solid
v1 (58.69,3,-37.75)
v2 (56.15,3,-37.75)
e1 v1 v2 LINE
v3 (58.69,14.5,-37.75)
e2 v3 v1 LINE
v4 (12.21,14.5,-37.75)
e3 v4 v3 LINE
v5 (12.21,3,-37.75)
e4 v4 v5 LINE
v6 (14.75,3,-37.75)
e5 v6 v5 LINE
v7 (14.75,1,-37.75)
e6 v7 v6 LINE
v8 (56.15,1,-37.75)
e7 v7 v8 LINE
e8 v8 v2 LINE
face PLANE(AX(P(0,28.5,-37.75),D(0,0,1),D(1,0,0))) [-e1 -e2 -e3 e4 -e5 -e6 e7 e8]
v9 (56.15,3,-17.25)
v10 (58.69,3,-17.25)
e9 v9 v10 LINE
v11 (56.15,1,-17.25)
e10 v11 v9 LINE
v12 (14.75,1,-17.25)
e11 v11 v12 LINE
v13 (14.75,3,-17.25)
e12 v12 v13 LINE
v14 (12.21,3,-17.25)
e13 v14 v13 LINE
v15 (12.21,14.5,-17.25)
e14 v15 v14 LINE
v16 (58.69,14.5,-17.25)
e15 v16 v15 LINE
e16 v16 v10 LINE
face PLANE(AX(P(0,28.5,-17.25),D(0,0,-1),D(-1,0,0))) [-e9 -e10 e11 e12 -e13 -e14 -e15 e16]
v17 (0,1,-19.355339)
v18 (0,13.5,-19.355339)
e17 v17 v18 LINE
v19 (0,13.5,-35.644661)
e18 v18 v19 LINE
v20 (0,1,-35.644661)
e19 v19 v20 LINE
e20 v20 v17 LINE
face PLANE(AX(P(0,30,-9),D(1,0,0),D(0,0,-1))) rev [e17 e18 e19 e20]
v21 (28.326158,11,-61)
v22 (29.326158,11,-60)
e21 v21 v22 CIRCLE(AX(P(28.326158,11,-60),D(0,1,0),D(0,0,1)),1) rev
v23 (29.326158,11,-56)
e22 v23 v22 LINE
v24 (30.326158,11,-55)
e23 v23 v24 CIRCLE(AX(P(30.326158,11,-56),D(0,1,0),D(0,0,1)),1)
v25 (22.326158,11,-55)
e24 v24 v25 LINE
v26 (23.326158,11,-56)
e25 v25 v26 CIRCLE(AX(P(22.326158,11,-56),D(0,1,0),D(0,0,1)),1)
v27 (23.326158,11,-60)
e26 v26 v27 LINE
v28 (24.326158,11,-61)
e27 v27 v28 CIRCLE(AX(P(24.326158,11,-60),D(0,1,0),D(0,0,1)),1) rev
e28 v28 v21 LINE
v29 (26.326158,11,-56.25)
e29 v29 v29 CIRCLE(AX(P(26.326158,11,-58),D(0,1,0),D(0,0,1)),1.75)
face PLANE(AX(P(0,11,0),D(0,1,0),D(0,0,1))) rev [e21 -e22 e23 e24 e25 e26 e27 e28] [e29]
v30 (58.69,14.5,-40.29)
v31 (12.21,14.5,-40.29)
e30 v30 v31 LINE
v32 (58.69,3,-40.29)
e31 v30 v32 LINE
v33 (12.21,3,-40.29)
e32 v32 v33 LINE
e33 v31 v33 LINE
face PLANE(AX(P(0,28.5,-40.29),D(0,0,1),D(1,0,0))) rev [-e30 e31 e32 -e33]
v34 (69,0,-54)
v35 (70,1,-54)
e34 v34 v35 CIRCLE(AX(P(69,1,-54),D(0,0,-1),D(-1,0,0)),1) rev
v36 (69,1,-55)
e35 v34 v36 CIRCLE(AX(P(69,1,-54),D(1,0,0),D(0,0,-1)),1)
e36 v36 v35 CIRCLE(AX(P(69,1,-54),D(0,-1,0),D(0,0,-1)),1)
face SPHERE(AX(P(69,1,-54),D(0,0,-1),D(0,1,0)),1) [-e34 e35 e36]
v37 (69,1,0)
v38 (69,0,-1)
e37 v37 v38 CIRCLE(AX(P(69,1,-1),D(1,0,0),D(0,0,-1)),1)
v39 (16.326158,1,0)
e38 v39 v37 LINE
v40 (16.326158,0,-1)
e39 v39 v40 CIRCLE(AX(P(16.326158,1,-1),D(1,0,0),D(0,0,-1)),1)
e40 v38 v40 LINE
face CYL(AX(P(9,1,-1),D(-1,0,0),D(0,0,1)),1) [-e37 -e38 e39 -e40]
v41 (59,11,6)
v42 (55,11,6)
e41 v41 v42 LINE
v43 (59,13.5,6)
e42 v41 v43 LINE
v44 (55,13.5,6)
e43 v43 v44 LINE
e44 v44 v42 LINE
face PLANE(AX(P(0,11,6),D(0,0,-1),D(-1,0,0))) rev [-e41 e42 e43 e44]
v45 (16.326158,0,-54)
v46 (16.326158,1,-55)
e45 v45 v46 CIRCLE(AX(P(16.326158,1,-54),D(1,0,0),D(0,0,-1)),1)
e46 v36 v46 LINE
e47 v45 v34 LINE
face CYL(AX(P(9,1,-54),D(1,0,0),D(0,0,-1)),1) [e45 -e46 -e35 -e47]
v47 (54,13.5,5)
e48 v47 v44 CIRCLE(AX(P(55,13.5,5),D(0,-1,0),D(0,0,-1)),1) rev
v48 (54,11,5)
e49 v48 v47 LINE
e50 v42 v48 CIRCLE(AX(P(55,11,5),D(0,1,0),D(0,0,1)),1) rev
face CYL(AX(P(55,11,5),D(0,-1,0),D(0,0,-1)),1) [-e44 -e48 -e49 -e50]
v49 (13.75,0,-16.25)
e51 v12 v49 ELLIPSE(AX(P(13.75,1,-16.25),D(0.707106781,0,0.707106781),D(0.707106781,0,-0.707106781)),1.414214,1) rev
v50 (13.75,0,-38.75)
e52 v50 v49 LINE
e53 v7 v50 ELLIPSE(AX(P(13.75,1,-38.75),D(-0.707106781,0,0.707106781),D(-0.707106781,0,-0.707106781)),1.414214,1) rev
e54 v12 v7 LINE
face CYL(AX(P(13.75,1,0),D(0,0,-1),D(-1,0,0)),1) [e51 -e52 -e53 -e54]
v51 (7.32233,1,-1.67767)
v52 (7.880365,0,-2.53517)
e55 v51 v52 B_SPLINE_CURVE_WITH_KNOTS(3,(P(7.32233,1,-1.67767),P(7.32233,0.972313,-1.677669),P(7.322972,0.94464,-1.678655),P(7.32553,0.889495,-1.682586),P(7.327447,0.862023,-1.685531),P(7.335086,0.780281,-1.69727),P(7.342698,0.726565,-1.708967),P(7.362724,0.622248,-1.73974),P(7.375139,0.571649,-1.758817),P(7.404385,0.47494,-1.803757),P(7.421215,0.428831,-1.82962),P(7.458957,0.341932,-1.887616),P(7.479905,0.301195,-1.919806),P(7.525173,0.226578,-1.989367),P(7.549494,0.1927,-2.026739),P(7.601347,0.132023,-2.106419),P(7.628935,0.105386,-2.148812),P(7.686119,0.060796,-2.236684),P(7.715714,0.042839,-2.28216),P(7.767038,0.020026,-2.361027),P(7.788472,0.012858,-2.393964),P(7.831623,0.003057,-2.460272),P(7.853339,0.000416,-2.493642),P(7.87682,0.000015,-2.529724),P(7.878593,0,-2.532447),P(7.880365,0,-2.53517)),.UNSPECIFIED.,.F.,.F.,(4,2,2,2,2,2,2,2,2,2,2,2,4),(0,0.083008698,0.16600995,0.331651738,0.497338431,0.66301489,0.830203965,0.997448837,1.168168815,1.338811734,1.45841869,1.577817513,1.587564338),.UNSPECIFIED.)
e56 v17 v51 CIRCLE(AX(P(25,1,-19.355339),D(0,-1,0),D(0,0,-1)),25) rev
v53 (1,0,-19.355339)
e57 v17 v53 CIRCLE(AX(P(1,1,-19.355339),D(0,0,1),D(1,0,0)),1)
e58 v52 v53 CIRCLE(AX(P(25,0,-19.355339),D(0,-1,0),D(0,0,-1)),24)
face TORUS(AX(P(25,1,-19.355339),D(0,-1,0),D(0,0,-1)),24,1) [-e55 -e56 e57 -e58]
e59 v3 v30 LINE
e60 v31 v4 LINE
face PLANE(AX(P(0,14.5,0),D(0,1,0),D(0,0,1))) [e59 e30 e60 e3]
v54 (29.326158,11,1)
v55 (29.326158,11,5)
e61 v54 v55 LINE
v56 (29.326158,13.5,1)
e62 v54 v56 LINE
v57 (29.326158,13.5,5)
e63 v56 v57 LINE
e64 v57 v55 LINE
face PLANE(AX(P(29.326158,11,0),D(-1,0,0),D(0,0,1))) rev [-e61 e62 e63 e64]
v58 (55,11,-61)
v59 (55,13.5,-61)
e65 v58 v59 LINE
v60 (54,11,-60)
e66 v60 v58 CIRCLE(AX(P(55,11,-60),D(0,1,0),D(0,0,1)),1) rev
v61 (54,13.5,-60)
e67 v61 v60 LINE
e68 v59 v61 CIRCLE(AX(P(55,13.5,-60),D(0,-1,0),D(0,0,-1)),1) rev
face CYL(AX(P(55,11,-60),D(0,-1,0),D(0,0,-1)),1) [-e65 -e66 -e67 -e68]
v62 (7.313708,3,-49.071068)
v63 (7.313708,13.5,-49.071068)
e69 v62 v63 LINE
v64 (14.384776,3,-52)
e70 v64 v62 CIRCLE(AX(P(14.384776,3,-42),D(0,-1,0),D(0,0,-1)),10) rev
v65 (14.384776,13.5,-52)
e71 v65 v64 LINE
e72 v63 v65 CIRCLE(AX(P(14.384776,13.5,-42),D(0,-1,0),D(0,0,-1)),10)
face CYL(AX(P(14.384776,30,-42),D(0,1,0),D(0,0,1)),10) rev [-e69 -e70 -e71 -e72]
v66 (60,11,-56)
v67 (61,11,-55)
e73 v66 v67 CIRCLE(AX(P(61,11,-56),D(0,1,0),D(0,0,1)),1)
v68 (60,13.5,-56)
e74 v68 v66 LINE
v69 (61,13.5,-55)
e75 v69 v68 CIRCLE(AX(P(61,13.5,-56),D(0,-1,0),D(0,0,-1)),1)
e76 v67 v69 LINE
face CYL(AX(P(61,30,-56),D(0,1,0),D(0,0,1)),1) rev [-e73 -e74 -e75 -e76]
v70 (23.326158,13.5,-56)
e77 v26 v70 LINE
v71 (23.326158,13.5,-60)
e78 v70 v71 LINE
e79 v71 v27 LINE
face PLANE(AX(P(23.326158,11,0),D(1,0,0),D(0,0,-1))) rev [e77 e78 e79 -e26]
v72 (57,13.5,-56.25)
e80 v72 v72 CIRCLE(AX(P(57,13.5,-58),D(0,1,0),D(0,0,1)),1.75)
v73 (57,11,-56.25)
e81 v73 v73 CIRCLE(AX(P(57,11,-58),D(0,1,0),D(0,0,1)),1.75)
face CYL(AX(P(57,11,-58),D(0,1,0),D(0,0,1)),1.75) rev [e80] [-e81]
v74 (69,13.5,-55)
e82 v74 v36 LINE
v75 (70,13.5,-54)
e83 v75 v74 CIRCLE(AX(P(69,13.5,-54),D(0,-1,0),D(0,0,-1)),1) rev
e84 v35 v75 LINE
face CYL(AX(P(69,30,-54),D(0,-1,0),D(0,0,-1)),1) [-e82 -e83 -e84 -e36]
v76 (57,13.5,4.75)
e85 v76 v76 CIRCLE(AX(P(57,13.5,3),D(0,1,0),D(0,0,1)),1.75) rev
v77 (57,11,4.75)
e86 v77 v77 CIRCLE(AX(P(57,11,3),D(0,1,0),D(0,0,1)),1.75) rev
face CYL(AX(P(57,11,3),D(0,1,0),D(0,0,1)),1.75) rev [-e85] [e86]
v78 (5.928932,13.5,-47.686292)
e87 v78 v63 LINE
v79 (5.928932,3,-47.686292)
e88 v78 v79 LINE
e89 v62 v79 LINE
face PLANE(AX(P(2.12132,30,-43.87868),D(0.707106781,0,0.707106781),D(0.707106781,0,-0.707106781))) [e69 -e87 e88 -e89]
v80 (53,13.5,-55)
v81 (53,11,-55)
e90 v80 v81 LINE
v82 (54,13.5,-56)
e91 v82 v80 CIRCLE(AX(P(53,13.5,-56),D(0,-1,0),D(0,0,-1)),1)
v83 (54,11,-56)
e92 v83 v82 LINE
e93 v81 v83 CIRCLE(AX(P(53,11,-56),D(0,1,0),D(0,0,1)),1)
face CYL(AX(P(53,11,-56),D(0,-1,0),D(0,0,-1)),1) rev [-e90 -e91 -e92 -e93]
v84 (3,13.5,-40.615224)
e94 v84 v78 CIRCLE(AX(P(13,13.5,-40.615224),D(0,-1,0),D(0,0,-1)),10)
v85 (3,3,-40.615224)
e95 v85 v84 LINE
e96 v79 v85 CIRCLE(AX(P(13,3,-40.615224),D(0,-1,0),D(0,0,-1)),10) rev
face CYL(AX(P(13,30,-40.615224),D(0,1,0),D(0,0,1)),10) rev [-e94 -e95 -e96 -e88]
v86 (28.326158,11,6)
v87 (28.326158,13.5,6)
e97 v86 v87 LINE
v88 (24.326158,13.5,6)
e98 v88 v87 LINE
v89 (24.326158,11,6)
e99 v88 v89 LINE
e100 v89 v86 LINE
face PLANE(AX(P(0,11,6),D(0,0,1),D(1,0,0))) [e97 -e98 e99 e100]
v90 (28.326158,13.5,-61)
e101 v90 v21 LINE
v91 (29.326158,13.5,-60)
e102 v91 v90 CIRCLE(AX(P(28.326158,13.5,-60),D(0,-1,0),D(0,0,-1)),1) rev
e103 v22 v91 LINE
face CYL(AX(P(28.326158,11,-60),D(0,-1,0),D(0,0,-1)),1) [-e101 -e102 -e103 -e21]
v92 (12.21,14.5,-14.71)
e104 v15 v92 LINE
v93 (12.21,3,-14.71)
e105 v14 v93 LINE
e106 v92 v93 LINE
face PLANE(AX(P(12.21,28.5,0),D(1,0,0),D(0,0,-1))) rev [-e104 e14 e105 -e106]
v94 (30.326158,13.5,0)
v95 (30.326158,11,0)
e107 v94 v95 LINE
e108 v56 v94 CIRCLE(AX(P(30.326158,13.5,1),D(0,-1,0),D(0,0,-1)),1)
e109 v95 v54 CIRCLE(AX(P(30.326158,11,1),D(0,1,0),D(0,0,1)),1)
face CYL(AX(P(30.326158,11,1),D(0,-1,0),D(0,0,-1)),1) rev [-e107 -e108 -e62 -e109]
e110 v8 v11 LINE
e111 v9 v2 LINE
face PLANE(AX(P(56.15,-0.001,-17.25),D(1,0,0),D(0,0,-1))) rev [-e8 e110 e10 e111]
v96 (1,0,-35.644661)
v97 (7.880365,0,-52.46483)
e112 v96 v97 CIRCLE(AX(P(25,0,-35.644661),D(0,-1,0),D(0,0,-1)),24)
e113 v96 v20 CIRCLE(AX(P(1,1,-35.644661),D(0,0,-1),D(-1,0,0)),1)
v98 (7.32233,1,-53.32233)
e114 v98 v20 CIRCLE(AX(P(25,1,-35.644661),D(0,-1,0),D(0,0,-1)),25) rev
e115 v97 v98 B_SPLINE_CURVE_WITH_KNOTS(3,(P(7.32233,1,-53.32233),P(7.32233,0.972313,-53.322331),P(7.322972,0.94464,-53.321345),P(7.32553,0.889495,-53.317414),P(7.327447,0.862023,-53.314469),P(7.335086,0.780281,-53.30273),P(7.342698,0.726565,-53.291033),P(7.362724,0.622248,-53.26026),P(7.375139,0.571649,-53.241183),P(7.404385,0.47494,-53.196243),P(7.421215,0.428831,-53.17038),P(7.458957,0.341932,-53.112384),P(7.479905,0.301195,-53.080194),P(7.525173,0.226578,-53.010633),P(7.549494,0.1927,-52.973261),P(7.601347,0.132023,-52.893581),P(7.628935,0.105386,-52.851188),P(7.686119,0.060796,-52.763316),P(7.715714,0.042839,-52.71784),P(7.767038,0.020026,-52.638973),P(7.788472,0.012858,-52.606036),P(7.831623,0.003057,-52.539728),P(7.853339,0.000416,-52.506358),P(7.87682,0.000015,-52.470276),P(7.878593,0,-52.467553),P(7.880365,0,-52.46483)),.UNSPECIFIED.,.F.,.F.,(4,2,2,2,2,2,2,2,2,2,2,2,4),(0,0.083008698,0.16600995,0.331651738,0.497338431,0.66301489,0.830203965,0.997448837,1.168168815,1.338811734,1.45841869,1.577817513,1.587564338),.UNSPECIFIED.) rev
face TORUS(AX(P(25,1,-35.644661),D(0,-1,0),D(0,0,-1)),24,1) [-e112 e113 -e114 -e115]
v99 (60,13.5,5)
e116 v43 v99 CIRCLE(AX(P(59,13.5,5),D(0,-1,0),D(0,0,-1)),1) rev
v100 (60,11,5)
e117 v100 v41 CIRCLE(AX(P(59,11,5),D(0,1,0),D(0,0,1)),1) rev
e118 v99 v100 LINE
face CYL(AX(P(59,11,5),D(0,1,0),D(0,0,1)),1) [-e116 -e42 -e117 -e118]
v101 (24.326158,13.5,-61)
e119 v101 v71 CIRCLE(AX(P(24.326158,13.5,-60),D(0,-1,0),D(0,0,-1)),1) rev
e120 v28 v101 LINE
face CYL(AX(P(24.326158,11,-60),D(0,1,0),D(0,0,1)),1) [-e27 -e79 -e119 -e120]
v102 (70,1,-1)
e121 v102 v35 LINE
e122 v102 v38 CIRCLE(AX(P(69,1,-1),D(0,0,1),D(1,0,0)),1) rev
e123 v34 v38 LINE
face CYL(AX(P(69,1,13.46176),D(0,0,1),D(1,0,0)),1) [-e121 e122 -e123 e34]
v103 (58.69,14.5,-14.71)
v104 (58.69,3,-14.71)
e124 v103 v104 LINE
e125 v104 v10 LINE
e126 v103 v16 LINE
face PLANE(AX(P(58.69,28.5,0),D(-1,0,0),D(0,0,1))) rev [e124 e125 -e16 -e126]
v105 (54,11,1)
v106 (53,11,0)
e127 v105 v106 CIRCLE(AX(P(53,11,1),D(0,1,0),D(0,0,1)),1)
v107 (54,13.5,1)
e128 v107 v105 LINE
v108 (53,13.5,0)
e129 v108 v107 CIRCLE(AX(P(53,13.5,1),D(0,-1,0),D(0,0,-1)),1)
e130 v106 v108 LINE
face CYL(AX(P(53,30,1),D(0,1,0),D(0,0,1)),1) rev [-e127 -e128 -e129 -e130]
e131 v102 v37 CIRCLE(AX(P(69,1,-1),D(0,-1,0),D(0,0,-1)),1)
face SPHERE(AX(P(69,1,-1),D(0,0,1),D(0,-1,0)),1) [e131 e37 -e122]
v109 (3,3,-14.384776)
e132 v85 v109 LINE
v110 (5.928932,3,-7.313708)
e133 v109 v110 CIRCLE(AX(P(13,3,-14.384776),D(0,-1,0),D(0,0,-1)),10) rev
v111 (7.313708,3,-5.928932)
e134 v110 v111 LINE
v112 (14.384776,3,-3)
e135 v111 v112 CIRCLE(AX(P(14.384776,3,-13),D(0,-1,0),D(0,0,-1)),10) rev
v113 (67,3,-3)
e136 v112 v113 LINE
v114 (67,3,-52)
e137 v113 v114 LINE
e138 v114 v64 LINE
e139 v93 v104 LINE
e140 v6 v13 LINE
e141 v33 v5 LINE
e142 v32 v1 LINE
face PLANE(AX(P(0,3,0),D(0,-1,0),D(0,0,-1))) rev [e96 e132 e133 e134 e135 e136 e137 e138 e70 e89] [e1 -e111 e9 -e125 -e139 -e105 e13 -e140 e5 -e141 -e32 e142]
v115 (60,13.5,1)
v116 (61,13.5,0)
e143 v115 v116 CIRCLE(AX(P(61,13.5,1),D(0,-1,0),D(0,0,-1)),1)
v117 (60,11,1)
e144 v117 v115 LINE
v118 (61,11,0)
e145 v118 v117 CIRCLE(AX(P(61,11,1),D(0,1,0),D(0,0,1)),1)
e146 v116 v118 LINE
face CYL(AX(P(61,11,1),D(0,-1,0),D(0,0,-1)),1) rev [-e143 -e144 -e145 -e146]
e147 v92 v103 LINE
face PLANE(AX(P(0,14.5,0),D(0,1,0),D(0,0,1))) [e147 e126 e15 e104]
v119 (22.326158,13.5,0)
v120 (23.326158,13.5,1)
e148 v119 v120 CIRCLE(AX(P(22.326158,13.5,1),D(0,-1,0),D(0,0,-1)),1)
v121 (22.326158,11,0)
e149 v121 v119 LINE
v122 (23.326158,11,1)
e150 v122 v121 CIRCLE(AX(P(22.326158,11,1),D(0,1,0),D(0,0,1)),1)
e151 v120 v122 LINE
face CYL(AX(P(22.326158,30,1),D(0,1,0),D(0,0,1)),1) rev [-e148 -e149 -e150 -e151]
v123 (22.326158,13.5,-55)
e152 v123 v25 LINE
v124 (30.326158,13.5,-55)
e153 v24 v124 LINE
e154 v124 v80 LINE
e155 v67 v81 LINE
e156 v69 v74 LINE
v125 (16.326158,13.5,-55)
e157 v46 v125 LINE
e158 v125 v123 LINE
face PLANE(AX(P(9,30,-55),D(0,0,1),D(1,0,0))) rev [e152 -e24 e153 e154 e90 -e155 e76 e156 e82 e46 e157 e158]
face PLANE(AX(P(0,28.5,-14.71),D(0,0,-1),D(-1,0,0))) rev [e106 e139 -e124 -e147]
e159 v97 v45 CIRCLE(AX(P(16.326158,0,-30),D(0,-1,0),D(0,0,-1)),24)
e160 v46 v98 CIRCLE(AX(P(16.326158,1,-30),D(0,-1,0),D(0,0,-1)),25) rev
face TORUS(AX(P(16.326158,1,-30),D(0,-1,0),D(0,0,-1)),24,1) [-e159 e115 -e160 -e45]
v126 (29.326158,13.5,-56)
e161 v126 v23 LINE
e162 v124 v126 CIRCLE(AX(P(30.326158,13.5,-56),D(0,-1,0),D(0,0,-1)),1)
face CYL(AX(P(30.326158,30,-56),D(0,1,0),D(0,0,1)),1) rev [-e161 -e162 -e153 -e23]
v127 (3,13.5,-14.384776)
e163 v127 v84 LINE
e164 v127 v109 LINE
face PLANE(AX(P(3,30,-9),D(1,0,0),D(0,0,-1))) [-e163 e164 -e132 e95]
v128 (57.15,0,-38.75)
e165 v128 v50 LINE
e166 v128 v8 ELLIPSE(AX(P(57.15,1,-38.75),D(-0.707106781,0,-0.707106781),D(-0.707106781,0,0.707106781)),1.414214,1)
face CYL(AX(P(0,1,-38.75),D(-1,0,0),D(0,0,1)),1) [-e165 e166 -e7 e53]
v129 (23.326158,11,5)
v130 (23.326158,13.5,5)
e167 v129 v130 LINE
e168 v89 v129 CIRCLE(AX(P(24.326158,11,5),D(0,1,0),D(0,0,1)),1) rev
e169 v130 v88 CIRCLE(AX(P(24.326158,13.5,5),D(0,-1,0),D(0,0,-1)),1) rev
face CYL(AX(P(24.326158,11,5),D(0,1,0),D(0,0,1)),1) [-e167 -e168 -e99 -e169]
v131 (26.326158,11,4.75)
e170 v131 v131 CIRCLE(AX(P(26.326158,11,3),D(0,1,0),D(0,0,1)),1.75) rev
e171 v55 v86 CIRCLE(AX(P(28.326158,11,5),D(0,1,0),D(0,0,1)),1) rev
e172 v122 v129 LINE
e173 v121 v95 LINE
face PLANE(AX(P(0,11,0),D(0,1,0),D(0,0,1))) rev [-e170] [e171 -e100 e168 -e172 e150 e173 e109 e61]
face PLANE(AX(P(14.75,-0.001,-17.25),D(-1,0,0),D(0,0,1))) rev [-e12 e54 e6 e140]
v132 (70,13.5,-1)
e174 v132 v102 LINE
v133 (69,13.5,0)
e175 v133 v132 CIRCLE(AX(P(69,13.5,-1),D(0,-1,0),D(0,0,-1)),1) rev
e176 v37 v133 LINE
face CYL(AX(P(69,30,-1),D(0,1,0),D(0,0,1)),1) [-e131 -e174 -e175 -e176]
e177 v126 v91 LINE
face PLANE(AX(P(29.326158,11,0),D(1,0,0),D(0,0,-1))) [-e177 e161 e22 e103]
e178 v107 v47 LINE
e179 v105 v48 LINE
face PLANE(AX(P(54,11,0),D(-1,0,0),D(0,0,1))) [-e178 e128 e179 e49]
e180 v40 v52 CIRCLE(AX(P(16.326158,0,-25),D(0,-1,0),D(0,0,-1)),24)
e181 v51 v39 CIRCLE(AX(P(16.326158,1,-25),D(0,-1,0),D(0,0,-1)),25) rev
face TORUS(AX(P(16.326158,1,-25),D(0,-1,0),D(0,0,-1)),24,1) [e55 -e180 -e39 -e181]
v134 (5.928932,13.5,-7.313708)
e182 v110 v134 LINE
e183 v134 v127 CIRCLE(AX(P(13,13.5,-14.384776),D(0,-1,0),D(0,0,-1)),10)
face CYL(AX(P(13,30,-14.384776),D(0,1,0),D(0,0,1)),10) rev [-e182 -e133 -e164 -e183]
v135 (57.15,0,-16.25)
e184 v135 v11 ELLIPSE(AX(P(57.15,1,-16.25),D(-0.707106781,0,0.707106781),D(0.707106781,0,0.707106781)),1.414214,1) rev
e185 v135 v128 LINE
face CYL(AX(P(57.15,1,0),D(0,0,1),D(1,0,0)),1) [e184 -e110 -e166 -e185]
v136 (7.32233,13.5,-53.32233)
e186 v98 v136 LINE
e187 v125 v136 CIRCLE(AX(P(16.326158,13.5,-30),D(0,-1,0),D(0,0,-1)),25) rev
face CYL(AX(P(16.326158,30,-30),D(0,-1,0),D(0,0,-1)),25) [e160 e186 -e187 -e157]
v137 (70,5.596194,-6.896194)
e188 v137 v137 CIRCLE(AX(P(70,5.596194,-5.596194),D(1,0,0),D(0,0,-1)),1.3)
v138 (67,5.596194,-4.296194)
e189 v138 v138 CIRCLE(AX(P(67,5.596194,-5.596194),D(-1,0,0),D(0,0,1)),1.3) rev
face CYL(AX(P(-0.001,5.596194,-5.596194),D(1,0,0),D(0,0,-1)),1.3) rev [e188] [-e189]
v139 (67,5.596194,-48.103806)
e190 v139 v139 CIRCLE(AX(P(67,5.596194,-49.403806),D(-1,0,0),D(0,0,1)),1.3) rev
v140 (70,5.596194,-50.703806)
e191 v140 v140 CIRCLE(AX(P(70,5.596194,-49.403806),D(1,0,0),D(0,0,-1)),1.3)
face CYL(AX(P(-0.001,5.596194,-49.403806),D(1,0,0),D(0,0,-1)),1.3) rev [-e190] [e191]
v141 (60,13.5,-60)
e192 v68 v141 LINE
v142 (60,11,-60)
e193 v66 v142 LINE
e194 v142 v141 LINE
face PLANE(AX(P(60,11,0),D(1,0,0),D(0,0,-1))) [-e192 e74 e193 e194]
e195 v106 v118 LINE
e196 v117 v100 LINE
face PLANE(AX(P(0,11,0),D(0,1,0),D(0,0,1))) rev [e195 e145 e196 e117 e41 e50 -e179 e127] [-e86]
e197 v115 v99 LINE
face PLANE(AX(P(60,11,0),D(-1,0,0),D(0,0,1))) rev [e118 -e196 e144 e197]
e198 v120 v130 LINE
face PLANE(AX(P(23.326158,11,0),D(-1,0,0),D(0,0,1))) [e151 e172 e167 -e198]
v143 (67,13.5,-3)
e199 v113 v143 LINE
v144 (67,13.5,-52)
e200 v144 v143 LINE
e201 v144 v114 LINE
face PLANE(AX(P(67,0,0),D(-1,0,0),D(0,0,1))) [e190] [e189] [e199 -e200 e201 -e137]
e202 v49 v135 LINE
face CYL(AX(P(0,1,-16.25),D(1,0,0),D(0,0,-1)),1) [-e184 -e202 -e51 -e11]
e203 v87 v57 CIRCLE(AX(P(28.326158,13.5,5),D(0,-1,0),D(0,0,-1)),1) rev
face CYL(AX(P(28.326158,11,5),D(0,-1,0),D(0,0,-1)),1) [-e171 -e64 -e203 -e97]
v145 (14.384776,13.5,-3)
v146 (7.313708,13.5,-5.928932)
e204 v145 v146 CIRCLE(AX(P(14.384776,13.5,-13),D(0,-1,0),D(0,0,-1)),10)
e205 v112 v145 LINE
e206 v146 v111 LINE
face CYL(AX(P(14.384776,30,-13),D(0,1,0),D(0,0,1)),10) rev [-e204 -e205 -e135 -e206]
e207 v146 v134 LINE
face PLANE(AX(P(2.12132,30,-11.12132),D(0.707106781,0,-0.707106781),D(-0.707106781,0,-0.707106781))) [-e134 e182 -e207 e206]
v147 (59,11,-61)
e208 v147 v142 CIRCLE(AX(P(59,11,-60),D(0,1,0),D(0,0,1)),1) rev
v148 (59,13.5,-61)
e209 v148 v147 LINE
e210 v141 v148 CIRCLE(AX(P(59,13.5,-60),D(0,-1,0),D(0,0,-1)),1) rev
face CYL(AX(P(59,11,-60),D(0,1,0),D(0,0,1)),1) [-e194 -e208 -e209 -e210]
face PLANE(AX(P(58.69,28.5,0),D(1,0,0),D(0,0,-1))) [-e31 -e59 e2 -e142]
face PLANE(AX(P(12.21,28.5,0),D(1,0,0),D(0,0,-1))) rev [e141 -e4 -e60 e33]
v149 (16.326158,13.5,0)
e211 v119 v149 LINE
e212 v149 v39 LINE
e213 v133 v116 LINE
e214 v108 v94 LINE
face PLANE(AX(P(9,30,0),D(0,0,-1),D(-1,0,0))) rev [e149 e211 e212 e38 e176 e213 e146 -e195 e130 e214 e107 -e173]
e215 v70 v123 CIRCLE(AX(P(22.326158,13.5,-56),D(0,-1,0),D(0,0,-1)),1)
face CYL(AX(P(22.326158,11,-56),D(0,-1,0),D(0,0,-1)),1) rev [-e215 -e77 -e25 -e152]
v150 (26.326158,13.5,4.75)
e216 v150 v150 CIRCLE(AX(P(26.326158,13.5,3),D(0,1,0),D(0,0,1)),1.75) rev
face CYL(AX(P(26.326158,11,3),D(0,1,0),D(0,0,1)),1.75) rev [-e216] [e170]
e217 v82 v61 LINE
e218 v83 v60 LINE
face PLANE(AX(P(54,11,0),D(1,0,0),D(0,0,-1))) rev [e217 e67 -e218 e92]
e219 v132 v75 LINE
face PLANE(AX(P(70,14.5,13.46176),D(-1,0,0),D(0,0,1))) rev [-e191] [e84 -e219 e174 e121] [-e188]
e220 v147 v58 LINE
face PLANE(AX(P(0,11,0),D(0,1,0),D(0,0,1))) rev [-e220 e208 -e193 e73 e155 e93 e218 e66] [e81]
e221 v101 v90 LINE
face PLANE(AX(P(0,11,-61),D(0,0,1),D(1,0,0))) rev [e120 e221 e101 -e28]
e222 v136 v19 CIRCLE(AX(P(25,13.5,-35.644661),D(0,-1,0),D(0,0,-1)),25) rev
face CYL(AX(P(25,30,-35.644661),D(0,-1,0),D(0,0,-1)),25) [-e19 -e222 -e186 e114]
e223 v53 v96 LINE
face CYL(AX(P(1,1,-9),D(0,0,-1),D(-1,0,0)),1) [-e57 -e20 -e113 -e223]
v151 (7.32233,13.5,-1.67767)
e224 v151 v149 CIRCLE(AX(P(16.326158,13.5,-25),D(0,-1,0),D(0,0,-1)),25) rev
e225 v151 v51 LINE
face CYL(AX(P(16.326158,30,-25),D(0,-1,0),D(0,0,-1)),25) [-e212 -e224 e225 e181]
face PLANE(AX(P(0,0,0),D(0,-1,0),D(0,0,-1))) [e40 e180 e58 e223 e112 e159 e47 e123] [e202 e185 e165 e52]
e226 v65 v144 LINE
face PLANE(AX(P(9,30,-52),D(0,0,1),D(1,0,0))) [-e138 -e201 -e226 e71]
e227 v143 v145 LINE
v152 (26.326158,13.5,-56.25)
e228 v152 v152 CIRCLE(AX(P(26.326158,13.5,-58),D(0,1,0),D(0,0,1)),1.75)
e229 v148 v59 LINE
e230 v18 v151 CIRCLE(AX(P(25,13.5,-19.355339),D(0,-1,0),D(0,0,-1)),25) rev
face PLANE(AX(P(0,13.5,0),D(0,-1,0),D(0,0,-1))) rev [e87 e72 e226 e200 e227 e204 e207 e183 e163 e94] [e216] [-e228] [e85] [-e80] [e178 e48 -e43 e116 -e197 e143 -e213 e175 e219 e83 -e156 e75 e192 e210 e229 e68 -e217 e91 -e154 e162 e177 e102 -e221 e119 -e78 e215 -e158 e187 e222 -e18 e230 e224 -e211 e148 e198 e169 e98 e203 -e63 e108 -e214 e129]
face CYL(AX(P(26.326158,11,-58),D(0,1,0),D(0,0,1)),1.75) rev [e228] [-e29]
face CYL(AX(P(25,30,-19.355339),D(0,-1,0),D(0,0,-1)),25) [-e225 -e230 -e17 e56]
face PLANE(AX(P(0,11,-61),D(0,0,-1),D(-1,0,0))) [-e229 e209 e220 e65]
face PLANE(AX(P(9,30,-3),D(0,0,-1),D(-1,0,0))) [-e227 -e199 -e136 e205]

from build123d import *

# Parameters (mm, degrees)
BOSS_EXTRUDE1_DEPTH          = 30
SHELL2_T                     = 3
CUT_EXTRUDE2_REACH           = 183.177
BOSS_EXTRUDE5_DEPTH          = 25.5
SKETCH17_W                   = 8
SKETCH17_H                   = 25.58
BOSS_EXTRUDE6_DEPTH          = 5
CUT_EXTRUDE3_REACH           = 182.934
SKETCH18_R                   = 1.75
SKETCH20_W                   = 197.48203017
SKETCH20_H                   = 83.172325934
CUT_EXTRUDE4_DEPTH           = 16.5
CUT_EXTRUDE5_REACH           = 180.984
OUTLINE_OF_MOTOR_PRESS_FIT_W = 41.4
OUTLINE_OF_MOTOR_PRESS_FIT_H = 20.5
SKETCH24_W                   = 46.48
SKETCH24_H                   = 2.54
BOSS_EXTRUDE7_DEPTH          = 1
CUT_EXTRUDE6_DEPTH           = 180.263074837
CUT_EXTRUDE6_DEPTH_BACK      = 180.263074837
SKETCH26_W                   = 55
SKETCH26_H                   = 13.5
BOSS_EXTRUDE8_DEPTH          = 3
FILLET1_R                    = 25
FILLET2_R                    = 25
SKETCH28_W                   = 6
SKETCH28_H                   = 6
SKETCH28_R                   = 1.75
BOSS_EXTRUDE9_DEPTH          = 2.5
FILLET3_R                    = 1
FILLET4_R                    = 10
CUT_EXTRUDE7_REACH           = 95.975
SKETCH30_R                   = 1.3


with BuildPart() as part:
    # Sketch1 → Boss-Extrude1 (new body)
    with BuildSketch(Plane(origin=(0, 0, 0), x_dir=(1, 0, 0), z_dir=(0, 1, 0))):
        Polygon((0, 46), (9, 55), (161, 55), (170, 46), (170, 9), (161, 0), (9, 0), (0, 9), align=None)
    extrude(amount=BOSS_EXTRUDE1_DEPTH)

    # Shell2 (no face opened: a closed hollow body)
    add(offset(amount=-SHELL2_T, mode=Mode.PRIVATE), mode=Mode.SUBTRACT)

    # Sketch2 → Cut-Extrude2 (cut, up to next)
    with BuildSketch(Plane(origin=(0, 30, 0), x_dir=(1, 0, 0), z_dir=(0, 1, 0)), mode=Mode.PRIVATE) as cut_extrude2_sk1:
        Polygon((3, 44.757359313), (3, 10.242640687), (10.242640687, 3), (159.757359313, 3), (167, 10.242640687), (167, 44.757359313), (159.757359313, 52), (10.242640687, 52), align=None)
    cut_extrude2_tool1 = extrude(cut_extrude2_sk1.sketch, amount=-CUT_EXTRUDE2_REACH, mode=Mode.PRIVATE) & part.part
    add(cut_extrude2_tool1.solids().sort_by_distance((85, 30, -27.5))[0], mode=Mode.SUBTRACT)

    # Sketch16 → Boss-Extrude5 (add)
    with BuildSketch(Plane(origin=(0, 3, 0), x_dir=(1, 0, 0), z_dir=(0, 1, 0))):
        Polygon((52.69, 40.29), (18.21, 40.29), (12.21, 40.29), (12.21, 37.75), (14.75, 37.75), (18.21, 37.75), (52.69, 37.75), (56.15, 37.75), (58.69, 37.75), (58.69, 40.29), align=None)
        Polygon((18.21, 17.25), (52.69, 17.25), (56.15, 17.25), (58.69, 17.25), (58.69, 14.71), (52.69, 14.71), (18.21, 14.71), (12.21, 14.71), (12.21, 17.25), (14.75, 17.25), align=None)
    extrude(amount=BOSS_EXTRUDE5_DEPTH)

    # Sketch17 → Boss-Extrude6 (add)
    with BuildSketch(Plane(origin=(0, 28.5, 0), x_dir=(1, 0, 0), z_dir=(0, 1, 0))):
        with Locations((60.192970397, 27.5)):
            Rectangle(SKETCH17_W, SKETCH17_H)
        with Locations((10.75, 27.5)):
            Rectangle(SKETCH17_W, SKETCH17_H)
    extrude(amount=-BOSS_EXTRUDE6_DEPTH)

    # Sketch18 → Cut-Extrude3 (cut, up to next)
    with BuildSketch(Plane(origin=(0, 28.5, 0), x_dir=(1, 0, 0), z_dir=(0, 1, 0)), mode=Mode.PRIVATE) as cut_extrude3_sk1:
        with Locations(Location((59.75, 32.5, 0), (0, 0, 270))):
            Circle(SKETCH18_R)
    cut_extrude3_tool1 = extrude(cut_extrude3_sk1.sketch, amount=-CUT_EXTRUDE3_REACH, mode=Mode.PRIVATE) & part.part
    # Sketch18 → Cut-Extrude3 (cut, up to next)
    with BuildSketch(Plane(origin=(0, 28.5, 0), x_dir=(1, 0, 0), z_dir=(0, 1, 0)), mode=Mode.PRIVATE) as cut_extrude3_sk2:
        with Locations(Location((59.75, 22.5, 0), (0, 0, 270))):
            Circle(SKETCH18_R)
    cut_extrude3_tool2 = extrude(cut_extrude3_sk2.sketch, amount=-CUT_EXTRUDE3_REACH, mode=Mode.PRIVATE) & part.part
    # Sketch18 → Cut-Extrude3 (cut, up to next)
    with BuildSketch(Plane(origin=(0, 28.5, 0), x_dir=(1, 0, 0), z_dir=(0, 1, 0)), mode=Mode.PRIVATE) as cut_extrude3_sk3:
        with Locations(Location((11.15, 22.5, 0), (0, 0, 270))):
            Circle(SKETCH18_R)
    cut_extrude3_tool3 = extrude(cut_extrude3_sk3.sketch, amount=-CUT_EXTRUDE3_REACH, mode=Mode.PRIVATE) & part.part
    # Sketch18 → Cut-Extrude3 (cut, up to next)
    with BuildSketch(Plane(origin=(0, 28.5, 0), x_dir=(1, 0, 0), z_dir=(0, 1, 0)), mode=Mode.PRIVATE) as cut_extrude3_sk4:
        with Locations(Location((11.15, 32.5, 0), (0, 0, 270))):
            Circle(SKETCH18_R)
    cut_extrude3_tool4 = extrude(cut_extrude3_sk4.sketch, amount=-CUT_EXTRUDE3_REACH, mode=Mode.PRIVATE) & part.part
    add(cut_extrude3_tool1.solids().sort_by_distance((59.75, 28.5, -32.5))[0], mode=Mode.SUBTRACT)
    add(cut_extrude3_tool2.solids().sort_by_distance((59.75, 28.5, -22.5))[0], mode=Mode.SUBTRACT)
    add(cut_extrude3_tool3.solids().sort_by_distance((11.15, 28.5, -22.5))[0], mode=Mode.SUBTRACT)
    add(cut_extrude3_tool4.solids().sort_by_distance((11.15, 28.5, -32.5))[0], mode=Mode.SUBTRACT)

    # Sketch20 → Cut-Extrude4 (cut)
    with BuildSketch(Plane(origin=(0, 30, 0), x_dir=(1, 0, 0), z_dir=(0, 1, 0))):
        with Locations((90.328880179, 24.260876754)):
            Rectangle(SKETCH20_W, SKETCH20_H)
    extrude(amount=-CUT_EXTRUDE4_DEPTH, mode=Mode.SUBTRACT)

    # Outline of motor press fit → Cut-Extrude5 (cut, up to next)
    with BuildSketch(Plane(origin=(0, 3, 0), x_dir=(1, 0, 0), z_dir=(0, 1, 0)), mode=Mode.PRIVATE) as cut_extrude5_sk1:
        with Locations((35.45, 27.5)):
            Rectangle(OUTLINE_OF_MOTOR_PRESS_FIT_W, OUTLINE_OF_MOTOR_PRESS_FIT_H)
    cut_extrude5_tool1 = extrude(cut_extrude5_sk1.sketch, amount=-CUT_EXTRUDE5_REACH, mode=Mode.PRIVATE) & part.part
    add(cut_extrude5_tool1.solids().sort_by_distance((35.45, 3, -27.5))[0], mode=Mode.SUBTRACT)

    # Sketch24 → Boss-Extrude7 (add)
    with BuildSketch(Plane(origin=(0, 13.5, 0), x_dir=(1, 0, 0), z_dir=(0, 1, 0))):
        with Locations((35.45, 39.02)):
            Rectangle(SKETCH24_W, SKETCH24_H)
        with Locations((35.45, 15.98)):
            Rectangle(SKETCH24_W, SKETCH24_H)
    extrude(amount=BOSS_EXTRUDE7_DEPTH)

    # Sketch25 → Cut-Extrude6 (cut, two sides: drawn at the far end of the back side and taken through both)
    with BuildSketch(Plane.XZ.offset(-CUT_EXTRUDE6_DEPTH_BACK)):
        Polygon((70, 13.461759558), (70, -84.299003111), (188.235365379, -84.299003111), (188.235365379, 23.0423143), (70, 19.718448369), align=None)
    extrude(amount=CUT_EXTRUDE6_DEPTH + CUT_EXTRUDE6_DEPTH_BACK, mode=Mode.SUBTRACT)

    # Sketch26 → Boss-Extrude8 (add)
    with BuildSketch(Plane(origin=(70, 0, 0), x_dir=(0, 0, -1), z_dir=(1, 0, 0))):
        with Locations((27.5, 6.75)):
            Rectangle(SKETCH26_W, SKETCH26_H)
    extrude(amount=-BOSS_EXTRUDE8_DEPTH)

    # Fillet1
    fillet1_edges = [part.edges().sort_by_distance(p)[0] for p in [
        (0, 6.75, -46),
        (0, 6.75, -9),
    ]]
    fillet(fillet1_edges, radius=FILLET1_R)

    # Fillet2
    # the kernel refuses this fillet: 25 mm, written as the material it takes off along each edge
    with BuildSketch(Plane(origin=(9, -18.315393785, 0), x_dir=(-0.7071067811865396, 0, -0.7071067811865553), z_dir=(0, 1, 0))) as fillet2_piece_1:
        with BuildLine():
            CenterArc((12.497293871, -22.858045188), FILLET2_R, 113.890402407, 21.109597593)
            Line((-5.180375658, -5.180375658), (-5.533929049, -4.826822268))
            Line((-5.533929049, -4.826822268), (-0.353553391, 0.353553391))
            Line((-0.353553391, 0.353553391), (0, 0.5))
            ThreePointArc((0, 0.5), (1.186291501, 0.5), (2.170088785, 0.457160904))
            Line((2.170088785, 0.457160904), (2.372583002, 0))
        make_face()
    extrude(amount=50.13078757, mode=Mode.SUBTRACT)
    with BuildSketch(Plane(origin=(9, -18.315393785, -55), x_dir=(-0.7071067811865434, 0, 0.7071067811865516), z_dir=(0, 1, 0))) as fillet2_piece_2:
        with BuildLine():
            CenterArc((12.497293871, 22.858045188), FILLET2_R, 225, 21.109597593)
            Line((-5.180375658, 5.180375658), (-5.533929049, 4.826822268))
            Line((-5.533929049, 4.826822268), (-0.353553391, -0.353553391))
            Line((-0.353553391, -0.353553391), (0, -0.5))
            ThreePointArc((0, -0.5), (1.186291501, -0.5), (2.170088785, -0.457160904))
            Line((2.170088785, -0.457160904), (2.372583002, 0))
        make_face()
    extrude(amount=50.13078757, mode=Mode.SUBTRACT)

    # Sketch28 → Boss-Extrude9 (add)
    # profile 1 of 4: a face of its own
    with BuildSketch(Plane(origin=(0, 13.5, 0), x_dir=(1, 0, 0), z_dir=(0, 1, 0))):
        with Locations((26.326157514, 58)):
            Rectangle(SKETCH28_W, SKETCH28_H)
        with Locations(Location((26.326157514, 58, 0), (0, 0, 270))):
            Circle(SKETCH28_R, mode=Mode.SUBTRACT)
    # profile 2 of 4: a face of its own
    with BuildSketch(Plane(origin=(0, 13.5, 0), x_dir=(1, 0, 0), z_dir=(0, 1, 0))):
        with Locations((57, 58)):
            Rectangle(SKETCH28_W, SKETCH28_H)
        with Locations(Location((57, 58, 0), (0, 0, 270))):
            Circle(SKETCH28_R, mode=Mode.SUBTRACT)
    # profile 3 of 4: a face of its own
    with BuildSketch(Plane(origin=(0, 13.5, 0), x_dir=(1, 0, 0), z_dir=(0, 1, 0))):
        with Locations((57, -3)):
            Rectangle(SKETCH28_W, SKETCH28_H)
        with Locations(Location((57, -3, 0), (0, 0, 270))):
            Circle(SKETCH28_R, mode=Mode.SUBTRACT)
    # profile 4 of 4: a face of its own
    with BuildSketch(Plane(origin=(0, 13.5, 0), x_dir=(1, 0, 0), z_dir=(0, 1, 0))):
        with Locations((26.326157514, -3)):
            Rectangle(SKETCH28_W, SKETCH28_H)
        with Locations(Location((26.326157514, -3, 0), (0, 0, 270))):
            Circle(SKETCH28_R, mode=Mode.SUBTRACT)
    extrude(amount=-BOSS_EXTRUDE9_DEPTH)

    # Fillet3
    fillet3_edges = [part.edges().sort_by_distance(p)[0] for p in [
        (14.75, 0, -27.5),
        (35.45, 0, -37.75),
        (56.15, 0, -27.5),
        (35.45, 0, -17.25),
        (43.163078757, 0, -55),
        (70, 0, -27.5),
        (70, 6.75, -55),
        (70, 6.75, 0),
        (0, 0, -27.5),
        (1.903011687, 0, -45.21174675),
        (1.903011687, 0, -9.78825325),
        (43.163078757, 0, 0),
        (11.746761362, 0, -54.577004107),
        (11.746761362, 0, -0.422995893),
        (23.326157514, 12.25, 0),
        (29.326157514, 12.25, 0),
        (29.326157514, 12.25, 6),
        (23.326157514, 12.25, 6),
        (60, 12.25, 0),
        (60, 12.25, 6),
        (54, 12.25, 6),
        (54, 12.25, 0),
        (54, 12.25, -55),
        (54, 12.25, -61),
        (60, 12.25, -61),
        (60, 12.25, -55),
        (29.326157514, 12.25, -55),
        (23.326157514, 12.25, -55),
        (23.326157514, 12.25, -61),
        (29.326157514, 12.25, -61),
    ]]
    fillet(fillet3_edges, radius=FILLET3_R)

    # Fillet4
    fillet4_edges = [part.edges().sort_by_distance(p)[0] for p in [
        (10.242640687, 8.25, -52),
        (3, 8.25, -44.757359313),
        (10.242640687, 8.25, -3),
        (3, 8.25, -10.242640687),
    ]]
    fillet(fillet4_edges, radius=FILLET4_R)

    # Sketch30 → Cut-Extrude7 (cut, up to next)
    with BuildSketch(Plane(origin=(70, 0, 0), x_dir=(0, 0, -1), z_dir=(1, 0, 0)), mode=Mode.PRIVATE) as cut_extrude7_sk1:
        with Locations((5.596194078, 5.596194078)):
            Circle(SKETCH30_R)
    cut_extrude7_tool1 = extrude(cut_extrude7_sk1.sketch, amount=-CUT_EXTRUDE7_REACH, mode=Mode.PRIVATE) & part.part
    # Sketch30 → Cut-Extrude7 (cut, up to next)
    with BuildSketch(Plane(origin=(70, 0, 0), x_dir=(0, 0, -1), z_dir=(1, 0, 0)), mode=Mode.PRIVATE) as cut_extrude7_sk2:
        with Locations((49.403805922, 5.596194078)):
            Circle(SKETCH30_R)
    cut_extrude7_tool2 = extrude(cut_extrude7_sk2.sketch, amount=-CUT_EXTRUDE7_REACH, mode=Mode.PRIVATE) & part.part
    add(cut_extrude7_tool1.solids().sort_by_distance((70, 5.596194, -5.596194))[0], mode=Mode.SUBTRACT)
    add(cut_extrude7_tool2.solids().sort_by_distance((70, 5.596194, -49.403806))[0], mode=Mode.SUBTRACT)


solid = part.part
